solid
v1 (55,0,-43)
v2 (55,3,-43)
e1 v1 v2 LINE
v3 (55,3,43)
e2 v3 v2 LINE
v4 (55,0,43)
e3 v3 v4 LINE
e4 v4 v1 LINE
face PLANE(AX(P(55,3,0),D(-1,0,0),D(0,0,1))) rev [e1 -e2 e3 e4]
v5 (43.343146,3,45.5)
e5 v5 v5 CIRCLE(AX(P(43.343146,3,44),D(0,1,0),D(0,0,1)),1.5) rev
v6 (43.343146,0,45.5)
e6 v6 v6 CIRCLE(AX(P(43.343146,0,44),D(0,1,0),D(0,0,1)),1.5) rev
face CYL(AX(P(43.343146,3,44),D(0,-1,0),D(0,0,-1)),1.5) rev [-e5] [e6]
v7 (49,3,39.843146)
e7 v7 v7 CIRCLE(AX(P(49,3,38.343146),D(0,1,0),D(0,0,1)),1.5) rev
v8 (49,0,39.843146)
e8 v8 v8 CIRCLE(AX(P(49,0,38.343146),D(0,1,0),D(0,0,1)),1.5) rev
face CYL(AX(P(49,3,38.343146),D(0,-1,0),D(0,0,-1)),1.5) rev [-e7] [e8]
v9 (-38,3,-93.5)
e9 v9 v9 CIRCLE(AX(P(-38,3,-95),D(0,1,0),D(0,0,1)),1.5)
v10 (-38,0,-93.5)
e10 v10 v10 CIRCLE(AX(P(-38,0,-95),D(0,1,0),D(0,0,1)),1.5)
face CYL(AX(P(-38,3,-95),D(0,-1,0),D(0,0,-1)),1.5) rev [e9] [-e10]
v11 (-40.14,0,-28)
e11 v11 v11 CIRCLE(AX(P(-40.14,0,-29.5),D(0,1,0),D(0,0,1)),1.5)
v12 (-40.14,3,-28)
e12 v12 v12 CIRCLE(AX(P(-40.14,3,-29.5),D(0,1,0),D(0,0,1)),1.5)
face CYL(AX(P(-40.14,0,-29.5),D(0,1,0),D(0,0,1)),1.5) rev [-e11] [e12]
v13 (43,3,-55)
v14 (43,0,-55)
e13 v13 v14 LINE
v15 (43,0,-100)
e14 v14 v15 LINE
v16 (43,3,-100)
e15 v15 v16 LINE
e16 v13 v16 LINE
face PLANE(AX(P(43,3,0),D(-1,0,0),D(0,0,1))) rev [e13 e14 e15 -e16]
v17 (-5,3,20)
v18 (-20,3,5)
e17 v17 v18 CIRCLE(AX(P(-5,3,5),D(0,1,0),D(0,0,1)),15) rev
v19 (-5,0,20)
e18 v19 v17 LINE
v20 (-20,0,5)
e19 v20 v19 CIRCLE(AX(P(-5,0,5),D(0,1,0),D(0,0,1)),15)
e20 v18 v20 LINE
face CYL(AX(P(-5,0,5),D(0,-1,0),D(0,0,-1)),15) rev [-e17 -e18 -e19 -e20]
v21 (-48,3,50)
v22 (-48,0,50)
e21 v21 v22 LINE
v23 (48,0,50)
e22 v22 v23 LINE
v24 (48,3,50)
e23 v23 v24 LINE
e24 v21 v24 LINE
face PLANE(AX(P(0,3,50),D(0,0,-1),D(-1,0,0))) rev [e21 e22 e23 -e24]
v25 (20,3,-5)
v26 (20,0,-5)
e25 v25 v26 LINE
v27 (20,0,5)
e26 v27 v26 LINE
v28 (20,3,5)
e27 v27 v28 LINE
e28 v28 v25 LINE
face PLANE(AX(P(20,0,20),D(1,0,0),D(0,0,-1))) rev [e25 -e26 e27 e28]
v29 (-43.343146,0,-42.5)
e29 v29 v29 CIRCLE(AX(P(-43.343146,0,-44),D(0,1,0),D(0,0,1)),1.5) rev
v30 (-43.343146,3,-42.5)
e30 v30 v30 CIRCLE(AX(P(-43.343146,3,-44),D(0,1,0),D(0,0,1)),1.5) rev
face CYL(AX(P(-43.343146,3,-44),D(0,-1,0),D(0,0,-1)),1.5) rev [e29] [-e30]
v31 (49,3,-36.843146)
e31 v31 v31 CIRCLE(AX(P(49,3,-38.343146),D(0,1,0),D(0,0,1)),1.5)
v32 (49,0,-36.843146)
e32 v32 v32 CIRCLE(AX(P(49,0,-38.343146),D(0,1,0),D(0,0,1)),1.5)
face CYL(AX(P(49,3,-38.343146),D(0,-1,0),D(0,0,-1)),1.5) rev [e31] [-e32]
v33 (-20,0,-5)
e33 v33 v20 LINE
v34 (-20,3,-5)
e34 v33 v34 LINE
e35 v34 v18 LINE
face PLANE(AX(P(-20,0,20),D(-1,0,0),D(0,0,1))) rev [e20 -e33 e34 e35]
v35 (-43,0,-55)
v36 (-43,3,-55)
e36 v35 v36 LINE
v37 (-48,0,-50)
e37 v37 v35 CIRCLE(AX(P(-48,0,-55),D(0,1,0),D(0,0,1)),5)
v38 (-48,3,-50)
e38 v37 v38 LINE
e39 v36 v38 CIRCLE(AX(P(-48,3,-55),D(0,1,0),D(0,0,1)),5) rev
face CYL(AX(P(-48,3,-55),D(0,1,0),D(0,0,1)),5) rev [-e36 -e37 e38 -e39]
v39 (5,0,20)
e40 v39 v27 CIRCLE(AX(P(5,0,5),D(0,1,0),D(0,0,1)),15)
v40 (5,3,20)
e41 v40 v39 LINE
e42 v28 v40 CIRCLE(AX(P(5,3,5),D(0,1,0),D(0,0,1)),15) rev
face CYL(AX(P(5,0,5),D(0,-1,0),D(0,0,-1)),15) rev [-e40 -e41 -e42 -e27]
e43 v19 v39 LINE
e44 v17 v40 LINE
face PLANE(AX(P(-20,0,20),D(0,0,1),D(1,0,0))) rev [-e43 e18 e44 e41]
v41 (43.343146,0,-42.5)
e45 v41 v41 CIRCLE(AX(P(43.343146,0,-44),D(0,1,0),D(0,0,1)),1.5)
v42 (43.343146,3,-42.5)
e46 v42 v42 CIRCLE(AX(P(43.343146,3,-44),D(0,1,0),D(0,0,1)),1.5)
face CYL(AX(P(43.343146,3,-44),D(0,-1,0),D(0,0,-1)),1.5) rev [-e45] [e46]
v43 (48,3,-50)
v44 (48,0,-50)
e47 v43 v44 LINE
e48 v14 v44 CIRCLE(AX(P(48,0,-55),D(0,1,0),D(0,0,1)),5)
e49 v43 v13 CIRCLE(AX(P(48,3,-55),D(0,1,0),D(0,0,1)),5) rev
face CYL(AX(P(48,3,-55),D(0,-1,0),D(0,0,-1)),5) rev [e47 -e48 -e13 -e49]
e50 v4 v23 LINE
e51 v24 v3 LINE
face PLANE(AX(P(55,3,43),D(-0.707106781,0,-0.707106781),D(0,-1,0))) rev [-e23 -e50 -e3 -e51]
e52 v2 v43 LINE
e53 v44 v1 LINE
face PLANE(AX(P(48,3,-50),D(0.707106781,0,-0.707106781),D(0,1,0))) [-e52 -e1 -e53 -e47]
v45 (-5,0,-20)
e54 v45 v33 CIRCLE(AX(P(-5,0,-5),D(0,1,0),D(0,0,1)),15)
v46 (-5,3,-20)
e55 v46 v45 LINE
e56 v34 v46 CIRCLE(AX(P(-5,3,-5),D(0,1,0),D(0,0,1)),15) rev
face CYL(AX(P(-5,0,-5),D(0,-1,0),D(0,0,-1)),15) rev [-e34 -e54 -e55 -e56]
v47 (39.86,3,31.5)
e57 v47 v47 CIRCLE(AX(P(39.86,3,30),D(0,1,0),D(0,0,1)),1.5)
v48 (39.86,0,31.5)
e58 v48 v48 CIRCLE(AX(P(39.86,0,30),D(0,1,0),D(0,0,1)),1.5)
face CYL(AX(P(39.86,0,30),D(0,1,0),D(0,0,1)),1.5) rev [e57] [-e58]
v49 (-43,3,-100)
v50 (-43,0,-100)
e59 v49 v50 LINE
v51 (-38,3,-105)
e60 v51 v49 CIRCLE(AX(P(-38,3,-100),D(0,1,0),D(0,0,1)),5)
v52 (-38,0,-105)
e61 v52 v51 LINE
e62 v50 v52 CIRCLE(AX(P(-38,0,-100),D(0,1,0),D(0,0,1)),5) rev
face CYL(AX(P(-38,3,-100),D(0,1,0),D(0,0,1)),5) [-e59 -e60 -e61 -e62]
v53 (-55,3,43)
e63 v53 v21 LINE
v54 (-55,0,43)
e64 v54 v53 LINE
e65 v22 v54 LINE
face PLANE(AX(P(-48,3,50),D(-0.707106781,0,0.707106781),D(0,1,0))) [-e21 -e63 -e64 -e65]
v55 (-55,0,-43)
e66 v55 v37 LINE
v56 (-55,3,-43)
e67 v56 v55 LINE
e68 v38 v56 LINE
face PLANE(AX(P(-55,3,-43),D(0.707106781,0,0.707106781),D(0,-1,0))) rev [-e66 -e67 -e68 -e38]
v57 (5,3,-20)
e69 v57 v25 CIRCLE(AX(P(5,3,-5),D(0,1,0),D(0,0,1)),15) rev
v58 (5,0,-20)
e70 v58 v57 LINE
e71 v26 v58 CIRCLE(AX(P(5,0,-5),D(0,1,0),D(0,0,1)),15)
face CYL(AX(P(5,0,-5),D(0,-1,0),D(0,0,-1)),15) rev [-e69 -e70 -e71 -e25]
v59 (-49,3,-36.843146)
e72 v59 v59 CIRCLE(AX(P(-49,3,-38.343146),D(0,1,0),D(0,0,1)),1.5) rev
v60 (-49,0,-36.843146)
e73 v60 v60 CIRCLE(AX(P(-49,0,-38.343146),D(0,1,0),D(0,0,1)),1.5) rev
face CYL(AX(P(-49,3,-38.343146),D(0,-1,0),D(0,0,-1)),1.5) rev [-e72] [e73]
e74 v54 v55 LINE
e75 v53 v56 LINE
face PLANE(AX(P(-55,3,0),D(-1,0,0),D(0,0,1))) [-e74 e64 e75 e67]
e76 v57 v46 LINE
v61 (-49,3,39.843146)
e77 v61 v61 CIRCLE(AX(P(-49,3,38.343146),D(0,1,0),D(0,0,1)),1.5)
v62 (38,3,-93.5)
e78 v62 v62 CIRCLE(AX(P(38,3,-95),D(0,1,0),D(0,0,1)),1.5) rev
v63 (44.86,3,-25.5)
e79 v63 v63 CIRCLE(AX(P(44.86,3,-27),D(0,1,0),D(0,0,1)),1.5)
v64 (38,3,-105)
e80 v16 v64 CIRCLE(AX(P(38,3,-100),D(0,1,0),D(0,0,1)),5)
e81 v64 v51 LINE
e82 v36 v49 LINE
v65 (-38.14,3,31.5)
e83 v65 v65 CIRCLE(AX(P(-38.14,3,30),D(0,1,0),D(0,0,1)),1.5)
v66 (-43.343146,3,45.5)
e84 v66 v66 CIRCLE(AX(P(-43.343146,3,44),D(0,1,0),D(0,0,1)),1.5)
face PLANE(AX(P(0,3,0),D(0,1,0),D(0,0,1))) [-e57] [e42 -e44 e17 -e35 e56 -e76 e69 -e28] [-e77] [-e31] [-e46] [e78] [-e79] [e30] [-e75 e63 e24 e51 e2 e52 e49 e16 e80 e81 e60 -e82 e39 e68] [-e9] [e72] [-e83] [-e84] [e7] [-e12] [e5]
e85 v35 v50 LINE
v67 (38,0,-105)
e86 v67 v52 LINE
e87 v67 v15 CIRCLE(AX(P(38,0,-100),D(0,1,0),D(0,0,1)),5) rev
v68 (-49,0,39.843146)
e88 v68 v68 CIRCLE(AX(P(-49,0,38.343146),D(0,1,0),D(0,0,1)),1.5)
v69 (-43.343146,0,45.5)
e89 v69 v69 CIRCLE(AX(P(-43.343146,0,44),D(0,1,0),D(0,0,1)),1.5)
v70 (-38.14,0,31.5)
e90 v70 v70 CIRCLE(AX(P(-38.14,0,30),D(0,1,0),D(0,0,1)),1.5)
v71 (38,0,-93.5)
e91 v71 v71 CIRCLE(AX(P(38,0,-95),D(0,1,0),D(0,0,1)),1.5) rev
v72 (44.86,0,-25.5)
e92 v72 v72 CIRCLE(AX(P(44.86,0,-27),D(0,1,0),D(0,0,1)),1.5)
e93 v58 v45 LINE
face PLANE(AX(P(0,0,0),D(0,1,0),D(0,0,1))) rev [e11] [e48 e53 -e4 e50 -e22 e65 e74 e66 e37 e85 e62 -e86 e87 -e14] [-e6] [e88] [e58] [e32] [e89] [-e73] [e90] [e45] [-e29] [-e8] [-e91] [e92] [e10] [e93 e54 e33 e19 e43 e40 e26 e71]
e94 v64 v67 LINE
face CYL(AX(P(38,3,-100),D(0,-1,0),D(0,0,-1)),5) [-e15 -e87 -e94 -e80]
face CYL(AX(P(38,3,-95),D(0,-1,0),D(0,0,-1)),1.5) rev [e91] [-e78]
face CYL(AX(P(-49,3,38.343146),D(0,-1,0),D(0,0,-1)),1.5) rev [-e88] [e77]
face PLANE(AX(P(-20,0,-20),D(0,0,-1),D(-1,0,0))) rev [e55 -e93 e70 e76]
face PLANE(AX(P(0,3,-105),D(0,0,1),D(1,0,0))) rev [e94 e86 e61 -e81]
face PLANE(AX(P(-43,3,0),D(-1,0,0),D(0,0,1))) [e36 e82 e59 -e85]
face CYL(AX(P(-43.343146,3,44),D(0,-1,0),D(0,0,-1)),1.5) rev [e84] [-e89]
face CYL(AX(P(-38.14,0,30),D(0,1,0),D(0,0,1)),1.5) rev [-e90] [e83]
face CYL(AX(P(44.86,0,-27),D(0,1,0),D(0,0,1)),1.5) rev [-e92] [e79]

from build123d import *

# Parameters (mm, degrees)
SKETCH_1_R          = 1.5
EXTRUDE_1_DEPTH     = 3
CHAMFER_1_SIZE      = 7
FILLET_START        = -1
FILLET_1_DEPTH      = 5
FILLET_1_2_DEPTH    = 3
SKETCH_3_R          = 1.5
SKETCH_3_W          = 40
SKETCH_3_H          = 40
CUT_EXTRUDE_1_DEPTH = 3
FILLET_2_R          = 15


with BuildPart() as part:
    # 草图1 → 凸台-拉伸1 (new body)
    with BuildSketch(Plane(origin=(0, 0, 0), x_dir=(1, 0, 0), z_dir=(0, 1, 0))):
        Polygon((-55, 50), (-55, -50), (55, -50), (55, 50), (43, 50), (43, 105), (-43, 105), (-43, 50), align=None)
        with Locations(Location((-43.343145751, -44, 0), (0, 0, 270))):
            Circle(SKETCH_1_R, mode=Mode.SUBTRACT)
        with Locations(Location((-49, -38.343145751, 0), (0, 0, 270))):
            Circle(SKETCH_1_R, mode=Mode.SUBTRACT)
        with Locations(Location((43.343145751, -44, 0), (0, 0, 270))):
            Circle(SKETCH_1_R, mode=Mode.SUBTRACT)
        with Locations(Location((49, -38.343145751, 0), (0, 0, 270))):
            Circle(SKETCH_1_R, mode=Mode.SUBTRACT)
        with Locations(Location((-49, 38.343145751, 0), (0, 0, 270))):
            Circle(SKETCH_1_R, mode=Mode.SUBTRACT)
        with Locations(Location((-43.343145751, 44, 0), (0, 0, 270))):
            Circle(SKETCH_1_R, mode=Mode.SUBTRACT)
        with Locations(Location((43.343145751, 44, 0), (0, 0, 270))):
            Circle(SKETCH_1_R, mode=Mode.SUBTRACT)
        with Locations(Location((49, 38.343145751, 0), (0, 0, 270))):
            Circle(SKETCH_1_R, mode=Mode.SUBTRACT)
        with Locations(Location((38, 95, 0), (0, 0, 270))):
            Circle(SKETCH_1_R, mode=Mode.SUBTRACT)
        with Locations(Location((-38, 95, 0), (0, 0, 270))):
            Circle(SKETCH_1_R, mode=Mode.SUBTRACT)
    extrude(amount=EXTRUDE_1_DEPTH)

    # 倒角1
    chamfer_1_edges = [part.edges().sort_by_distance(p)[0] for p in [
        (-55, 1.5, 50),
        (-55, 1.5, -50),
        (55, 1.5, -50),
        (55, 1.5, 50),
    ]]
    chamfer(chamfer_1_edges, length=CHAMFER_1_SIZE)

    # 圆角1: read off the stored shape, not the designer's step
    # 圆角1 outline → 圆角1 (cut)
    with BuildSketch(Plane(origin=(0, 0, 0), x_dir=(1, 0, 0), z_dir=(0, 1, 0)).offset(FILLET_START)):
        with BuildLine():
            ThreePointArc((-43, 100), (-41.535533906, 103.535533906), (-38, 105))
            Line((-38, 105), (-43, 105))
            Line((-43, 105), (-43, 100))
        make_face()
        with BuildLine():
            ThreePointArc((38, 105), (41.535533906, 103.535533906), (43, 100))
            Line((43, 100), (43, 105))
            Line((43, 105), (38, 105))
        make_face()
    extrude(amount=FILLET_1_DEPTH, mode=Mode.SUBTRACT)

    # Fillet 1 2 outline → Fillet 1 2 (add)
    with BuildSketch(Plane(origin=(0, 0, 0), x_dir=(1, 0, 0), z_dir=(0, 1, 0))):
        with BuildLine():
            Line((43, 50), (48, 50))
            ThreePointArc((48, 50), (44.464466094, 51.464466094), (43, 55))
            Line((43, 55), (43, 50))
        make_face()
        with BuildLine():
            Line((-43, 50), (-43, 55))
            ThreePointArc((-43, 55), (-44.464466094, 51.464466094), (-48, 50))
            Line((-48, 50), (-43, 50))
        make_face()
    extrude(amount=FILLET_1_2_DEPTH)

    # 草图3 → 切除-拉伸1 (cut)
    with BuildSketch(Plane(origin=(0, 3, 0), x_dir=(1, 0, 0), z_dir=(0, 1, 0))):
        with Locations(Location((-40.14, 29.5, 0), (0, 0, 270))):
            Circle(SKETCH_3_R)
        with Locations(Location((44.86, 27, 0), (0, 0, 270))):
            Circle(SKETCH_3_R)
        with Locations(Location((-38.14, -30, 0), (0, 0, 270))):
            Circle(SKETCH_3_R)
        with Locations(Location((39.86, -30, 0), (0, 0, 270))):
            Circle(SKETCH_3_R)
        Rectangle(SKETCH_3_W, SKETCH_3_H)
    extrude(amount=-CUT_EXTRUDE_1_DEPTH, mode=Mode.SUBTRACT)

    # 圆角2
    fillet_2_edges = [part.edges().sort_by_distance(p)[0] for p in [
        (20, 1.5, -20),
        (20, 1.5, 20),
        (-20, 1.5, 20),
        (-20, 1.5, -20),
    ]]
    fillet(fillet_2_edges, radius=FILLET_2_R)


solid = part.part
